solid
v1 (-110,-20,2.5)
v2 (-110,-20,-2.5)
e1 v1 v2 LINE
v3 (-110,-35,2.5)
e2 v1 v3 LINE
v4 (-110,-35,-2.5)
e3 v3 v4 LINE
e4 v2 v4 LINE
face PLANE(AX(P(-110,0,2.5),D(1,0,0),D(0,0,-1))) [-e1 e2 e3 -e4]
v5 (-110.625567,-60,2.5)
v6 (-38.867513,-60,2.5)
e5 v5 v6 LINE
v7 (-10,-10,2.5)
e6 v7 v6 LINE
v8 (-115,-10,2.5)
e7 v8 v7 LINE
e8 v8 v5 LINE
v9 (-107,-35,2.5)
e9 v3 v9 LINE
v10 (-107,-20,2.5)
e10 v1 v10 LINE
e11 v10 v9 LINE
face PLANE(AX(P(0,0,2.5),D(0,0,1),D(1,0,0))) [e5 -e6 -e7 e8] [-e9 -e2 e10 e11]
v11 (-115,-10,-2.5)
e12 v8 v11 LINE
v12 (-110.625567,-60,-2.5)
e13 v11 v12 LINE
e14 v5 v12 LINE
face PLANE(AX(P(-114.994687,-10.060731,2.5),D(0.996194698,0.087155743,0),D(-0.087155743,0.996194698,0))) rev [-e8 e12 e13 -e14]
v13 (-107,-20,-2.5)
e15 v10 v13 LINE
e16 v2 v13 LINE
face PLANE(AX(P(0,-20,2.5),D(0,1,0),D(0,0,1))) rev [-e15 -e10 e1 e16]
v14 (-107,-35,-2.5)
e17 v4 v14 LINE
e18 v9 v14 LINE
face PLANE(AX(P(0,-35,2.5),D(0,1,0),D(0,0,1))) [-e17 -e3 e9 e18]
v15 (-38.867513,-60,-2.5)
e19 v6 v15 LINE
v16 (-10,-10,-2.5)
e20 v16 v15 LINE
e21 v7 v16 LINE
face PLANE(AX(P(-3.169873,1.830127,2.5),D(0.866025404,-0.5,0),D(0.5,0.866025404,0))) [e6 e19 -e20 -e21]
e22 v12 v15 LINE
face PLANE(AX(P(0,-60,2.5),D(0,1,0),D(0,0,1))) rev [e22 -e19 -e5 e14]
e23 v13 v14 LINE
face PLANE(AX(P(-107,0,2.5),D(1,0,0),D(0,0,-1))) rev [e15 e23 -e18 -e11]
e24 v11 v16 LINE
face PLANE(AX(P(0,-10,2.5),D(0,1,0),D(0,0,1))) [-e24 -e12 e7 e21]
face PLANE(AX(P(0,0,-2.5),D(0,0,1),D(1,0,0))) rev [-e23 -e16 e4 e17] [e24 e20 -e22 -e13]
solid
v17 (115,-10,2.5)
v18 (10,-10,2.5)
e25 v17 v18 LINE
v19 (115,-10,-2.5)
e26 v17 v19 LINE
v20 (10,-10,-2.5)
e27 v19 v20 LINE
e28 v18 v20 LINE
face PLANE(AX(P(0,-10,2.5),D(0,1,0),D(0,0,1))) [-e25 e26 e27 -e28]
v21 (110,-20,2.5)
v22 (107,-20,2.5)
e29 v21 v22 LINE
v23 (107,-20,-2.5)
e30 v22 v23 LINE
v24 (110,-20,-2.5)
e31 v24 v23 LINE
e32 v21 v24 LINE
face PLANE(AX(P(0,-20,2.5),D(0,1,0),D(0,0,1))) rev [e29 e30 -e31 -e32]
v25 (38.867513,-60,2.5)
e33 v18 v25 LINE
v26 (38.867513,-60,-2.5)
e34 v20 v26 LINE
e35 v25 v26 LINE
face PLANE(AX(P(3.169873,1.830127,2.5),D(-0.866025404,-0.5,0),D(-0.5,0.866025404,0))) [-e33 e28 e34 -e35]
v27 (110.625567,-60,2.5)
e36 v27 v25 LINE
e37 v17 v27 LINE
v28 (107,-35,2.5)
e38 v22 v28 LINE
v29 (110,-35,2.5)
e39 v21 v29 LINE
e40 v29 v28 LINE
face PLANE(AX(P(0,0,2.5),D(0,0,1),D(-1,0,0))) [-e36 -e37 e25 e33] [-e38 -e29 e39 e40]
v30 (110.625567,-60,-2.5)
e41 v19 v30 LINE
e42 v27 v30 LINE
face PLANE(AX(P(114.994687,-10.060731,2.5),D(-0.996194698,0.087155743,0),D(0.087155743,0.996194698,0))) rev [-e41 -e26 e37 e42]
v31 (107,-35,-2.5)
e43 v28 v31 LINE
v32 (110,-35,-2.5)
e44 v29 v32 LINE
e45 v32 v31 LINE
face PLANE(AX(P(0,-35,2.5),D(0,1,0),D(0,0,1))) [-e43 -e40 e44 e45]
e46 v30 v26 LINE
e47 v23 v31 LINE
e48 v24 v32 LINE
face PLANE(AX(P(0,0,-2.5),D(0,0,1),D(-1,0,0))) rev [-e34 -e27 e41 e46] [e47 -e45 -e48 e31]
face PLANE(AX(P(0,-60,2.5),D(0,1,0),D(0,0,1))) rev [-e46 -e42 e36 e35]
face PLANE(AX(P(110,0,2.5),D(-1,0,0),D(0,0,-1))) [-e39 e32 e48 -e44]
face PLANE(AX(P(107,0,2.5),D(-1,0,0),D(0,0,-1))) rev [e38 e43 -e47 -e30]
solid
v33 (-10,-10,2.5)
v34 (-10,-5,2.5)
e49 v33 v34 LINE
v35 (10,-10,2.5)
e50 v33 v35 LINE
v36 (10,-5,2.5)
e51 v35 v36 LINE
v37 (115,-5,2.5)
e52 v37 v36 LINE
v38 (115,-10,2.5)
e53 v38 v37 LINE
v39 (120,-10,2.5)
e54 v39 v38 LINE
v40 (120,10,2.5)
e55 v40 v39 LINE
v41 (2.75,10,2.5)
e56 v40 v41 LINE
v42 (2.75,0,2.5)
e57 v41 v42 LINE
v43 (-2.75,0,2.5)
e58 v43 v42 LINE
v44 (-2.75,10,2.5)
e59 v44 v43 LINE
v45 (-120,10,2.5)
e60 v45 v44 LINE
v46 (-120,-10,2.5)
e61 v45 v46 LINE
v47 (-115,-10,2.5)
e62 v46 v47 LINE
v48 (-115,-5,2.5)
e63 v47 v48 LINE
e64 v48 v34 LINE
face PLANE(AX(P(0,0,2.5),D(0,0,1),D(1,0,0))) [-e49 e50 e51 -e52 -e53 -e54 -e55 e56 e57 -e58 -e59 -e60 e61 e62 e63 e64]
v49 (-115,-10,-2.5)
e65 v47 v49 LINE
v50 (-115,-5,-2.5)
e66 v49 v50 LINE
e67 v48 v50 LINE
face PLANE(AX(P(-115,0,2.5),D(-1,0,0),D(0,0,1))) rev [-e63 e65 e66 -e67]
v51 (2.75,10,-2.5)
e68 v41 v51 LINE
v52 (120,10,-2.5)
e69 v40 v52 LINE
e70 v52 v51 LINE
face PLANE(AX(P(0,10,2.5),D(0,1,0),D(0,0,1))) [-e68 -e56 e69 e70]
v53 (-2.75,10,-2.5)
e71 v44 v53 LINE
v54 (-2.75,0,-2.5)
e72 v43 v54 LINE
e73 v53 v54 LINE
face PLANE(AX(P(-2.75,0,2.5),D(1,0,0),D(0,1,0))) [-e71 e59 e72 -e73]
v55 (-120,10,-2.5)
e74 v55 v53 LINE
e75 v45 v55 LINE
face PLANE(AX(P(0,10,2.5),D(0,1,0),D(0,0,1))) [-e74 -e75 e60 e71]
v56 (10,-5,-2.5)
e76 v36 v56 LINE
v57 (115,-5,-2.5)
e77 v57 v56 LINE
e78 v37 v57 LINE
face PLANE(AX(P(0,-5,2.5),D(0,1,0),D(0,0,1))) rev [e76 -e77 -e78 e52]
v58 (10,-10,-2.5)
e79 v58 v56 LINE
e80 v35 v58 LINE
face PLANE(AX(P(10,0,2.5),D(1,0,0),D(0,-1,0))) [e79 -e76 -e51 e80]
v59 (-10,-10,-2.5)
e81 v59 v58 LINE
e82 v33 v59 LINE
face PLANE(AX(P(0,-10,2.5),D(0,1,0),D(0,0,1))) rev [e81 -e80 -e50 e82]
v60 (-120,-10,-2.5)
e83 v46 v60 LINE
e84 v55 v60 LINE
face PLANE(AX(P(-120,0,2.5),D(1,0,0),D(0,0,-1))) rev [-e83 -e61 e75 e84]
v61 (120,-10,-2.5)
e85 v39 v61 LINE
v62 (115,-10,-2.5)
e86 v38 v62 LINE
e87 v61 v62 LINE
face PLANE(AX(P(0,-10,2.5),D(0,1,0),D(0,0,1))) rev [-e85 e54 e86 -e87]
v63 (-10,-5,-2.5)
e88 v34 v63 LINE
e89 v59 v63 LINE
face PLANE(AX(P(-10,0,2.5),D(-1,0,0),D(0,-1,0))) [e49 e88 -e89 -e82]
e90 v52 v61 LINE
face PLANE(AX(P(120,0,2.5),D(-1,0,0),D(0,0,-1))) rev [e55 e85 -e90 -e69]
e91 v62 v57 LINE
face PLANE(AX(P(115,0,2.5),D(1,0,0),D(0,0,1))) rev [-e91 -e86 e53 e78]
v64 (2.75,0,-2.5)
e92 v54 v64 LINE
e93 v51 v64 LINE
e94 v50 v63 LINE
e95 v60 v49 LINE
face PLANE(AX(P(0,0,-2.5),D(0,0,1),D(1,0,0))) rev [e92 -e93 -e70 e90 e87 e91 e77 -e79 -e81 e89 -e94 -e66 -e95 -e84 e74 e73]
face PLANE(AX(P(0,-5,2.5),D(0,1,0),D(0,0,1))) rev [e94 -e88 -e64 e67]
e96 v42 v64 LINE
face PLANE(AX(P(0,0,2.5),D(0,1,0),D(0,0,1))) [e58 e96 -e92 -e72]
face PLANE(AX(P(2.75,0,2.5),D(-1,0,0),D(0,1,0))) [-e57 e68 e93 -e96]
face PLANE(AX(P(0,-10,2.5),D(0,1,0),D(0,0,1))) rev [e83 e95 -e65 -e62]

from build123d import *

# Parameters (mm, degrees)
SKETCH1_W             = 3
SKETCH1_H             = 15
BOSS_EXTRUDE2_DEPTH   = 2.5
BOSS_EXTRUDE2_2_DEPTH = 2.5
MIRROR1_START         = -2.5
MIRROR1_DEPTH         = 5


# Read off the part's stored shape, not the designer's step: Mirror1
with BuildPart() as part:
    # Sketch1 → Boss-Extrude2 (new, symmetric)
    with BuildSketch(Plane.XY):
        Polygon((-10, -10), (-115, -10), (-110.625566824, -60), (-38.867513459, -60), align=None)
        with Locations((-108.5, -27.5)):
            Rectangle(SKETCH1_W, SKETCH1_H, mode=Mode.SUBTRACT)
    extrude(amount=BOSS_EXTRUDE2_DEPTH, both=True)


with BuildPart() as body_2:
    # Sketch1 → Boss-Extrude2 2 (new, symmetric)
    with BuildSketch(Plane.XY):
        Polygon((-120, -10), (-115, -10), (-115, -5), (-10, -5), (-10, -10), (0, -10), (0, 0), (-2.75, 0), (-2.75, 10), (-120, 10), align=None)
    extrude(amount=BOSS_EXTRUDE2_2_DEPTH, both=True)

    # Mirror1 outline → Mirror1 (add)
    with BuildSketch(Plane.XY.offset(MIRROR1_START)):
        Polygon((0, -10), (10, -10), (10, -5), (115, -5), (115, -10), (120, -10), (120, 10), (2.75, 10), (2.75, 0), (0, 0), align=None)
    extrude(amount=MIRROR1_DEPTH)


with BuildPart() as body_3:
    # Mirror3: mirrored copy
    add(part.part.mirror(Plane(origin=(0, 0, 0), x_dir=(0, 0, 1), z_dir=(1, 0, 0))))


solid = Compound([part.part, body_2.part, body_3.part])
